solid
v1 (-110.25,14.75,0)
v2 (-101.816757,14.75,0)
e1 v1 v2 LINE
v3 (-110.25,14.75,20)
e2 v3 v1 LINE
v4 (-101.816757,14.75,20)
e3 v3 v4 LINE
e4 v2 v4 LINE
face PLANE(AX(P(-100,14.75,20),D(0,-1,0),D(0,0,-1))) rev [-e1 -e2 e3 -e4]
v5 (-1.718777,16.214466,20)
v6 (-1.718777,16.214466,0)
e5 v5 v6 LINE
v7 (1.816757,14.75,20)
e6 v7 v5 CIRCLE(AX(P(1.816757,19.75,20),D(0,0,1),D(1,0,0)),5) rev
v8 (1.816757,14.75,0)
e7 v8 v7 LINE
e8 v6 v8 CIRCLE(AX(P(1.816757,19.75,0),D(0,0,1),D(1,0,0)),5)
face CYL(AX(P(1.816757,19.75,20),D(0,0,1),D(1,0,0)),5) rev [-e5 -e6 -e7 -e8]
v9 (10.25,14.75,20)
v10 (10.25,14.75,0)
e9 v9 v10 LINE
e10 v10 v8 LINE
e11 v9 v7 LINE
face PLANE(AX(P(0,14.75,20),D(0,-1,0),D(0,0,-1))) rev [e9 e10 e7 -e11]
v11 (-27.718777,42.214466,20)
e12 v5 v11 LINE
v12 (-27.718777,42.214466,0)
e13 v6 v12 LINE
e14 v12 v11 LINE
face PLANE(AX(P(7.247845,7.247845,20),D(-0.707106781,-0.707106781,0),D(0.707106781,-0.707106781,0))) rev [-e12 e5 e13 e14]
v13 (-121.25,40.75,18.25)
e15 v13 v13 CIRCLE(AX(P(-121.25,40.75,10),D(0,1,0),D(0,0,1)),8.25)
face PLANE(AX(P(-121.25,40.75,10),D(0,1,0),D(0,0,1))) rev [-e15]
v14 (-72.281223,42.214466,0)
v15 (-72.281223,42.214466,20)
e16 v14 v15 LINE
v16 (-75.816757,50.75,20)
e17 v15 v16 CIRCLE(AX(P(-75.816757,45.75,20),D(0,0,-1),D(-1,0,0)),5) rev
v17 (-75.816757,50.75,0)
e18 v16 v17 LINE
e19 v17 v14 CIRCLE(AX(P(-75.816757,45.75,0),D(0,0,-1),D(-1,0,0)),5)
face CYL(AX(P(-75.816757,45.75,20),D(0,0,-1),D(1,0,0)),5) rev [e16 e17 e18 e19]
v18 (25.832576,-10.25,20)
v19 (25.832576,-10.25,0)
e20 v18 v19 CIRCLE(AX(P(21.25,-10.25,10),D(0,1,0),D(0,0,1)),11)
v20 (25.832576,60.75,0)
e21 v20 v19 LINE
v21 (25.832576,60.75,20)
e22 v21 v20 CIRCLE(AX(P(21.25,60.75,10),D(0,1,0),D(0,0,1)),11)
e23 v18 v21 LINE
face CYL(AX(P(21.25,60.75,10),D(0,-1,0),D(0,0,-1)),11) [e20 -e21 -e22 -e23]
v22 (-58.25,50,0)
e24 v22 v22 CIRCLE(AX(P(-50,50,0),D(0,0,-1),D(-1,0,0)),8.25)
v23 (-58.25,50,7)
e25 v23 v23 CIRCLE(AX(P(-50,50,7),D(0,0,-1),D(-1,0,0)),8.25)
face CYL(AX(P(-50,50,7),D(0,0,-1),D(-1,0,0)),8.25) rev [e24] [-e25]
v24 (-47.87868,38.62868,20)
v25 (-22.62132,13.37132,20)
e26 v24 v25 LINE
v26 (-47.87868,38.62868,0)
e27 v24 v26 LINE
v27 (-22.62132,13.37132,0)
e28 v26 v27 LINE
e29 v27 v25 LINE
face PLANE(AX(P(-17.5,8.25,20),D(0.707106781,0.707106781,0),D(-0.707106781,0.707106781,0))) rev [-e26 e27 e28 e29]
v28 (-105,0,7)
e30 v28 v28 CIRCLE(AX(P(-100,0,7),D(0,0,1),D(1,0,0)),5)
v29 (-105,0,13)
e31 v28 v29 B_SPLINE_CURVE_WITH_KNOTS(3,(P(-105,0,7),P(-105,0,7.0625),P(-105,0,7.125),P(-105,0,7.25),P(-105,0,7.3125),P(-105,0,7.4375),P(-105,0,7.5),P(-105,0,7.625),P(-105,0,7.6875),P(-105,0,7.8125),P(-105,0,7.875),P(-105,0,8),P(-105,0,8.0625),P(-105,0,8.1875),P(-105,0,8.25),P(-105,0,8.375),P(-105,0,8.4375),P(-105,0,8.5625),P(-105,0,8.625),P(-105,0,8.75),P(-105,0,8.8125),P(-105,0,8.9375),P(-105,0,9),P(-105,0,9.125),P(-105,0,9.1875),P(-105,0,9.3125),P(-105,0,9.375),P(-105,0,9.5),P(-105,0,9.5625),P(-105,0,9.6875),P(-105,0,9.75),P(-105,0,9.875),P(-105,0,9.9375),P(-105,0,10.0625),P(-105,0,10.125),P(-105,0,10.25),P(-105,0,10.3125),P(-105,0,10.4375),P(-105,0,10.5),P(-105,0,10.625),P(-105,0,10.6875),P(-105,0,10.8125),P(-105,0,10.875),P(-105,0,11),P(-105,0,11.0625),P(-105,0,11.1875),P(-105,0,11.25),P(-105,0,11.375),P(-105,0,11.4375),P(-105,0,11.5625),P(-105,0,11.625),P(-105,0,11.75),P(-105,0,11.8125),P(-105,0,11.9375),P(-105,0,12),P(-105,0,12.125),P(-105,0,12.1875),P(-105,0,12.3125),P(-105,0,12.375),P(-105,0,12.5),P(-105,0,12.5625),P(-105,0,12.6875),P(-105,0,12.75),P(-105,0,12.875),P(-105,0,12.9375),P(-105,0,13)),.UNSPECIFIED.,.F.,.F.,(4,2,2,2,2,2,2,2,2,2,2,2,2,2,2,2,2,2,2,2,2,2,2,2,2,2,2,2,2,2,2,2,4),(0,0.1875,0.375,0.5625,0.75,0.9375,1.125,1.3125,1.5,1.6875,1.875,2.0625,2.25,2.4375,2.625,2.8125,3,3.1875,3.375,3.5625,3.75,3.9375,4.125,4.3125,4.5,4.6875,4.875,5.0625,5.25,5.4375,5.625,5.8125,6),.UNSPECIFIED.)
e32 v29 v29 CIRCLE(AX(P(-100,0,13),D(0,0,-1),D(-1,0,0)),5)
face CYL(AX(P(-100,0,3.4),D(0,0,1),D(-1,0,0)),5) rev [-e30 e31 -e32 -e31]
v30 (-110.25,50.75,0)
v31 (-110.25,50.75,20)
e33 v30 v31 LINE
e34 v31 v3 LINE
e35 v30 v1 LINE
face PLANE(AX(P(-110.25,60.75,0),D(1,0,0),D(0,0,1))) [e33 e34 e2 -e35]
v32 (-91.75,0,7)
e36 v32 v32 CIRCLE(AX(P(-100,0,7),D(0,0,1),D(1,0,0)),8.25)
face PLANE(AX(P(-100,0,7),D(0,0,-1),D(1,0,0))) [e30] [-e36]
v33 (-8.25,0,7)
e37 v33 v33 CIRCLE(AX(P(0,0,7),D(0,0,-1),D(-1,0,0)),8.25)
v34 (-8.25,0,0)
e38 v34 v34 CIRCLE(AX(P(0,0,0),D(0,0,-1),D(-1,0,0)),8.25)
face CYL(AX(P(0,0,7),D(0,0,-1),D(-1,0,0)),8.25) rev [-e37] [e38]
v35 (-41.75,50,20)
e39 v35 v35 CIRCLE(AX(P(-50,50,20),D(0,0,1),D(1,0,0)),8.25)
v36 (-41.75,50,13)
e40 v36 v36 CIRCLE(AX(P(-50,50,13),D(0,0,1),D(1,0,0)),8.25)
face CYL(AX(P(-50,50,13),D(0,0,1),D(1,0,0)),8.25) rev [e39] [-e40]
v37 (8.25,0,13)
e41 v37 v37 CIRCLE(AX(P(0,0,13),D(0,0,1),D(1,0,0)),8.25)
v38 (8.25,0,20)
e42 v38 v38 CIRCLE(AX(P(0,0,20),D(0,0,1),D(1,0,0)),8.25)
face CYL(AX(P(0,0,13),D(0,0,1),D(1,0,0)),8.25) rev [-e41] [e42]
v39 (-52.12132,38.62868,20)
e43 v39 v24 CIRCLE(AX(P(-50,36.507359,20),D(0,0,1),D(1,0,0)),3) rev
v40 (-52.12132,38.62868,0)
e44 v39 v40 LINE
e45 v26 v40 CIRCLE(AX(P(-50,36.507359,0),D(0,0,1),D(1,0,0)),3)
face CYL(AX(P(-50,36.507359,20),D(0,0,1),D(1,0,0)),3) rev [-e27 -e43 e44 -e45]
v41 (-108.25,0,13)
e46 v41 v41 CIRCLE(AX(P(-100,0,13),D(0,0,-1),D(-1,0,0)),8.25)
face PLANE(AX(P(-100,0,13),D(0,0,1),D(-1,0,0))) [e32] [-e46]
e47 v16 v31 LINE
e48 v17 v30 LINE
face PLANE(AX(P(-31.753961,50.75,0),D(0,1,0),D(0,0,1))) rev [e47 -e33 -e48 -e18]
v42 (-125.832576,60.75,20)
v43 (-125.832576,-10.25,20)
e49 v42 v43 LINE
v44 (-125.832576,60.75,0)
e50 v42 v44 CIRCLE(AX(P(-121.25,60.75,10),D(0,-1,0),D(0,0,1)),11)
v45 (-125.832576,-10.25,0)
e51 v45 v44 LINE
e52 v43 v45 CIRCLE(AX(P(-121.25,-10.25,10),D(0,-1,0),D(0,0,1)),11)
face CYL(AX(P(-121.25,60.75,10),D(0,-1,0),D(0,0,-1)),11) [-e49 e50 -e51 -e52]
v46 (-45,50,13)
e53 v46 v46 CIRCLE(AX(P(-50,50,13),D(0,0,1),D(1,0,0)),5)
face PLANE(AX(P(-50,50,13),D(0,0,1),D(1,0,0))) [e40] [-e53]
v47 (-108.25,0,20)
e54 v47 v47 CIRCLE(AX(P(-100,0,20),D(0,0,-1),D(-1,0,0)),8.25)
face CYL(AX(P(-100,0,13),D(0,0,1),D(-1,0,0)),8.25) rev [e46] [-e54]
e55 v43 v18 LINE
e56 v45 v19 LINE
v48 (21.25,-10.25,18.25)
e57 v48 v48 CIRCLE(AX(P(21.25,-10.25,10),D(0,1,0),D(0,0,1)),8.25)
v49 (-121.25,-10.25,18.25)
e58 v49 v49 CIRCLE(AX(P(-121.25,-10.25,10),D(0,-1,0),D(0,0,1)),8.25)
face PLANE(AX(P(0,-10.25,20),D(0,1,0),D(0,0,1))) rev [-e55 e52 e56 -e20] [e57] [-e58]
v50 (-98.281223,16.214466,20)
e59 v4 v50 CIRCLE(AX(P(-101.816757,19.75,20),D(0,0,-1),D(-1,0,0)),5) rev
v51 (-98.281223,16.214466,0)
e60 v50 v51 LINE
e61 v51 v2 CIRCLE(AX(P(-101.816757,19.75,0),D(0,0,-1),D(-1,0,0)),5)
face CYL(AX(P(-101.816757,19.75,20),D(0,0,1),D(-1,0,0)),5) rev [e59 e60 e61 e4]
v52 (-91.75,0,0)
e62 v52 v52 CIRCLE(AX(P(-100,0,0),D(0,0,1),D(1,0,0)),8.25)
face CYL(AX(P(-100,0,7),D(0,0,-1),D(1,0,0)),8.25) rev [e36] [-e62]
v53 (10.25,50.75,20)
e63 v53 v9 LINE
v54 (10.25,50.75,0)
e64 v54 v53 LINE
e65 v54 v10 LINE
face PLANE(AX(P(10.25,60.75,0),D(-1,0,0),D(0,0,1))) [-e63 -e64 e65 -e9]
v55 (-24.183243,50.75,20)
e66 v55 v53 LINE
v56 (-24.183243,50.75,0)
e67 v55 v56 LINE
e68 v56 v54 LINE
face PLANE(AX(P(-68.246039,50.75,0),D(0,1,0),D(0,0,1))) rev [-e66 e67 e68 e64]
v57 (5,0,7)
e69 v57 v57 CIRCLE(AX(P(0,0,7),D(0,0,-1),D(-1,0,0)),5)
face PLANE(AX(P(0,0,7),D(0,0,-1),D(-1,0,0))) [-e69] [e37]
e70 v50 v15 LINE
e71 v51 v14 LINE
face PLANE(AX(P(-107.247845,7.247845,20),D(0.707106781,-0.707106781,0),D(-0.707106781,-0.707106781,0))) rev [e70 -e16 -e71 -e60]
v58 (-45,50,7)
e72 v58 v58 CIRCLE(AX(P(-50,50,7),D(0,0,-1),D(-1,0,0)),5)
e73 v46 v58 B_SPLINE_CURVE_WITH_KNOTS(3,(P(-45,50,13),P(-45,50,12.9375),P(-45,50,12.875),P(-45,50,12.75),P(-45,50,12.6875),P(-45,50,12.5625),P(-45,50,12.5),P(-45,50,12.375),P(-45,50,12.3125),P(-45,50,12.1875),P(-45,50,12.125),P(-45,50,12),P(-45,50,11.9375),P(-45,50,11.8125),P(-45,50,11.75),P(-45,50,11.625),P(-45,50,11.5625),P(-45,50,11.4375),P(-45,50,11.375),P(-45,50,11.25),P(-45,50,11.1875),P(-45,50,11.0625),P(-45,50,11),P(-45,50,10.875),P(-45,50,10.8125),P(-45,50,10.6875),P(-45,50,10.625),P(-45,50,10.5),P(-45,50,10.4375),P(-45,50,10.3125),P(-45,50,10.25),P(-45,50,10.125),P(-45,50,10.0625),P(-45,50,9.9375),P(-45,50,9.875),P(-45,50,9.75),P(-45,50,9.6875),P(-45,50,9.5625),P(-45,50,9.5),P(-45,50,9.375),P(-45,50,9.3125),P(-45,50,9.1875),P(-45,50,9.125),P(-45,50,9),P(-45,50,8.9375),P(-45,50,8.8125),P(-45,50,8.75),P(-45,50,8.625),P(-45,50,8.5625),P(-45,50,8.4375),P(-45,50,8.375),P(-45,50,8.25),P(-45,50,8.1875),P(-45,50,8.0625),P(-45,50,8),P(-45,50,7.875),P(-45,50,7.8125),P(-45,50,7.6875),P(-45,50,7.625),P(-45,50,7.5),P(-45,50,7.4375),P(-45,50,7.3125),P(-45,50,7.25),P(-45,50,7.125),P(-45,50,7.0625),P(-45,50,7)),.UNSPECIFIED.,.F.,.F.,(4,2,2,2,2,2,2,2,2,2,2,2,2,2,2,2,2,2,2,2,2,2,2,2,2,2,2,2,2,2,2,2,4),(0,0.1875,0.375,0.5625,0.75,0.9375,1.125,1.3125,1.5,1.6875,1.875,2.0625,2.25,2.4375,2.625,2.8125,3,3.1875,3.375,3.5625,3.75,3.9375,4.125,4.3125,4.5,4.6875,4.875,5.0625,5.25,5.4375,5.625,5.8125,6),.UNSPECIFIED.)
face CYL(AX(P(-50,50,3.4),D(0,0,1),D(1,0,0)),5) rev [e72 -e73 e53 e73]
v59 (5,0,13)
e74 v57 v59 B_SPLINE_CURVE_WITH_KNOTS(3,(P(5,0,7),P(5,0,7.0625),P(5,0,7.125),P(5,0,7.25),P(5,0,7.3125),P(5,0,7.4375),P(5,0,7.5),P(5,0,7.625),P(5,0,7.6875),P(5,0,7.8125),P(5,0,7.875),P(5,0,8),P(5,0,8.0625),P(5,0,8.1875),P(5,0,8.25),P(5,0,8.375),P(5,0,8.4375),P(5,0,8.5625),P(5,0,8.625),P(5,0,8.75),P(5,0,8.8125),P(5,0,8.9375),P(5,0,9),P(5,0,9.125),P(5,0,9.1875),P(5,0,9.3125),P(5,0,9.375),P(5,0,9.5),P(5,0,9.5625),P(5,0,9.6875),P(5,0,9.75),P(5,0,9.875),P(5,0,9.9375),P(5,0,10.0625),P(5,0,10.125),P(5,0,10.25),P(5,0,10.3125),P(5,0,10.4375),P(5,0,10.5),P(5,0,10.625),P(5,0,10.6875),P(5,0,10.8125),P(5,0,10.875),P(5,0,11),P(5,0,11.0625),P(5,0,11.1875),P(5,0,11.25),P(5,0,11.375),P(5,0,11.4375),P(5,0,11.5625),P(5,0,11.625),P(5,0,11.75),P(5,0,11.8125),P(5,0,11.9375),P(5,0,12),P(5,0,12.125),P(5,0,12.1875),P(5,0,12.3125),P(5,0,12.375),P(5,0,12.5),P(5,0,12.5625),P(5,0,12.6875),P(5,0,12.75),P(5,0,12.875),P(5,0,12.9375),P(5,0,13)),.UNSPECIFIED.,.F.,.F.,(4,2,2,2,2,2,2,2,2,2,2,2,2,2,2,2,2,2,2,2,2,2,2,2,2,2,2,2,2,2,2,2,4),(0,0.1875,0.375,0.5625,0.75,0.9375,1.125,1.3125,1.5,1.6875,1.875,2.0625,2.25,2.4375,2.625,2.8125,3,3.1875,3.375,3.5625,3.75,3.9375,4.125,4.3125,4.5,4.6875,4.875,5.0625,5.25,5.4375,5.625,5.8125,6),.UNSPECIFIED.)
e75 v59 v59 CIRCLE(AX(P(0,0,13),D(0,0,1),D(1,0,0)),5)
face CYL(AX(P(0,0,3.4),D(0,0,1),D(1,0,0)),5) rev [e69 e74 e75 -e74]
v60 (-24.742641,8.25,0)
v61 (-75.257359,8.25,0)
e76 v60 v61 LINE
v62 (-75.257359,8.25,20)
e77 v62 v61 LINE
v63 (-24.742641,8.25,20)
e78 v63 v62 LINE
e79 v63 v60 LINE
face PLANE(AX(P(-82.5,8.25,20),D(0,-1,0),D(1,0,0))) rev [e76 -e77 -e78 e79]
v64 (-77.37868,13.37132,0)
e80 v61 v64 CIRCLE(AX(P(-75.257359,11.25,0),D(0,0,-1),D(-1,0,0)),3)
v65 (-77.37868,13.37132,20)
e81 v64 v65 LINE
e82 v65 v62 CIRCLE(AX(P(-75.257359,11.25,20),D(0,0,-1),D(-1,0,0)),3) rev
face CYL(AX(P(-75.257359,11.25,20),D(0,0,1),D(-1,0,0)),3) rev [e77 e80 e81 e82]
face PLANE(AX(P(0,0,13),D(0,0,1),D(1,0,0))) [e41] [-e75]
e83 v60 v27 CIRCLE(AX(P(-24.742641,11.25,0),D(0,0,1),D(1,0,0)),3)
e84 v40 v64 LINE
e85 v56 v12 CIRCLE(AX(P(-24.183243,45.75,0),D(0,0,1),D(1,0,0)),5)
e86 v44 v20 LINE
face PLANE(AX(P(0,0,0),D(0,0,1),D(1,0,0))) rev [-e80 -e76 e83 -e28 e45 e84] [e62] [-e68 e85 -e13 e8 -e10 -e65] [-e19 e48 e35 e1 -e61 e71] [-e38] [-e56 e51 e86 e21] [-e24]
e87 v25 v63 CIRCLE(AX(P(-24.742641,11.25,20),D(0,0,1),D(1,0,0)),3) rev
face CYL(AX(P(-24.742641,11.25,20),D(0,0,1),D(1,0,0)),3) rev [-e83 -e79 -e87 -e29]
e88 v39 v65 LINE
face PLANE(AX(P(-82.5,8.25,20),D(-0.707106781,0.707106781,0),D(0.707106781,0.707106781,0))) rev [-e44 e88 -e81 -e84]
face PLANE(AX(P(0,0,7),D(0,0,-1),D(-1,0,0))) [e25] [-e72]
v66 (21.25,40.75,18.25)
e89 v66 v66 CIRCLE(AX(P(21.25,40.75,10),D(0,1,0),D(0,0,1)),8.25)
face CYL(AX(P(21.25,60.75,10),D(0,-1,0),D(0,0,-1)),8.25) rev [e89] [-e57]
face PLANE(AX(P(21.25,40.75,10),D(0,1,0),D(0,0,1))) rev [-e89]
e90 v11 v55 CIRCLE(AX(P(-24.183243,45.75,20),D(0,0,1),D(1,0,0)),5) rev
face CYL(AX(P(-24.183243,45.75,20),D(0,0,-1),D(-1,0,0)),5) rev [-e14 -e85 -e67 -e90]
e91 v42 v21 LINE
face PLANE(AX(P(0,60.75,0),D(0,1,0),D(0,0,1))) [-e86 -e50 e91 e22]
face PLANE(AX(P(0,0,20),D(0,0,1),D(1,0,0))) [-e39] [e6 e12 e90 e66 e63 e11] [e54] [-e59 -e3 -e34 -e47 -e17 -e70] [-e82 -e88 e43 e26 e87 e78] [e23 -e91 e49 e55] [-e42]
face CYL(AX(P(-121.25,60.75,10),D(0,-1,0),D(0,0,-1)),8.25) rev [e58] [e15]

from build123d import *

# Parameters (mm, degrees)
BOSS_EXTRUDE4_DEPTH      = 20
SKETCH3_R                = 8.25
CUT_EXTRUDE1_DEPTH       = 7
CUT_EXTRUDE2_START       = -7
SKETCH4_R                = 8.25
CUT_EXTRUDE2_DEPTH       = 7
CUT_EXTRUDE3_DEPTH       = 128.220772675
SKETCH6_R                = 5
CUT_EXTRUDE4_DEPTH       = 16.6
FILLET1_R                = 3
BOSS_EXTRUDE5_DEPTH      = 20
BOSS_EXTRUDE6_DEPTH      = 46
BOSS_EXTRUDE6_DEPTH_BACK = 25
SKETCH8_R                = 11
SKETCH8_R_2              = 8.25
BOSS_EXTRUDE7_REACH      = 138.572
SKETCH9_W                = 20
SKETCH9_H                = 10
FILLET2_R                = 5
FILLET5_R                = 5
SKETCH10_W               = 60.25
SKETCH10_H               = 70.5
CUT_EXTRUDE5_DEPTH       = 128.619062056
BOSS_EXTRUDE8_DEPTH      = 20
BOSS_EXTRUDE9_START      = -20
SKETCH12_R               = 11
BOSS_EXTRUDE9_DEPTH      = 20
SKETCH13_OUTSIDE_W       = 202.602
SKETCH13_OUTSIDE_H       = 60.102
SKETCH13_OUTSIDE_W_2     = 164.5
SKETCH13_OUTSIDE_H_2     = 20
CUT_EXTRUDE6_DEPTH       = 152.565373684


with BuildPart() as part:
    # Sketch2 → Boss-Extrude4 (new body)
    with BuildSketch(Plane.XY):
        with BuildLine():
            Line((-100, 10.25), (0, 10.25))
            ThreePointArc((0, 10.25), (10.25, 0), (0, -10.25))
            Line((0, -10.25), (-100, -10.25))
            ThreePointArc((-100, -10.25), (-110.25, 0), (-100, 10.25))
        make_face()
        with BuildLine():
            Line((-7.247844507, -7.247844507), (-57.247844507, 42.752155493))
            ThreePointArc((-57.247844507, 42.752155493), (-57.247844507, 57.247844507), (-42.752155493, 57.247844507))
            Line((-42.752155493, 57.247844507), (7.247844507, 7.247844507))
            ThreePointArc((7.247844507, 7.247844507), (7.247844507, -7.247844507), (-7.247844507, -7.247844507))
        make_face()
        with BuildLine():
            Line((-107.247844507, 7.247844507), (-57.247844507, 57.247844507))
            ThreePointArc((-57.247844507, 57.247844507), (-42.752155493, 57.247844507), (-42.752155493, 42.752155493))
            Line((-42.752155493, 42.752155493), (-92.752155493, -7.247844507))
            ThreePointArc((-92.752155493, -7.247844507), (-107.247844507, -7.247844507), (-107.247844507, 7.247844507))
        make_face()
    extrude(amount=BOSS_EXTRUDE4_DEPTH)

    # Sketch3 → Cut-Extrude1 (cut)
    with BuildSketch(Plane(origin=(0, 0, 0), x_dir=(-1, 0, 0), z_dir=(0, 0, -1))):
        Circle(SKETCH3_R)
        with Locations((50, 50)):
            Circle(SKETCH3_R)
        with Locations((100, 0)):
            Circle(SKETCH3_R)
    extrude(amount=-CUT_EXTRUDE1_DEPTH, mode=Mode.SUBTRACT)

    # Sketch4 → Cut-Extrude2 (cut)
    with BuildSketch(Plane.XY.offset(20).offset(CUT_EXTRUDE2_START)):
        with Locations(Location((-100, 0, 0), (0, 0, 180))):
            Circle(SKETCH4_R)
        with Locations(Location((-50, 50, 0), (0, 0, 180))):
            Circle(SKETCH4_R)
        with Locations(Location((0, 0, 0), (0, 0, 180))):
            Circle(SKETCH4_R)
    extrude(amount=CUT_EXTRUDE2_DEPTH, mode=Mode.SUBTRACT)

    # Sketch5 → Cut-Extrude3 (cut, through all)
    with BuildSketch(Plane(origin=(0, 0, 0), x_dir=(-1, 0, 0), z_dir=(0, 0, -1))):
        Polygon((17.5, 8.25), (50, 40.75), (82.5, 8.25), align=None)
    extrude(amount=-CUT_EXTRUDE3_DEPTH, mode=Mode.SUBTRACT)

    # Sketch6 → Cut-Extrude4 (cut)
    with BuildSketch(Plane.XY.offset(20)):
        with Locations((-100, 0)):
            Circle(SKETCH6_R)
        with Locations((-50, 50)):
            Circle(SKETCH6_R)
        Circle(SKETCH6_R)
    extrude(amount=-CUT_EXTRUDE4_DEPTH, mode=Mode.SUBTRACT)

    # Fillet1
    fillet1_edges = [part.edges().sort_by_distance(p)[0] for p in [
        (-82.5, 8.25, 10),
        (-17.5, 8.25, 10),
        (-50, 40.75, 10),
    ]]
    fillet(fillet1_edges, radius=FILLET1_R)

    # Sketch7 → Boss-Extrude5 (add)
    with BuildSketch(Plane(origin=(0, 0, 0), x_dir=(-1, 0, 0), z_dir=(0, 0, -1))):
        with BuildLine():
            Line((-10.25, 14.75), (-10.25, 0))
            ThreePointArc((-10.25, 0), (-9.469765208, 3.922505182), (-7.247844507, 7.247844507))
            Line((-7.247844507, 7.247844507), (0.254310986, 14.75))
            Line((0.254310986, 14.75), (-10.25, 14.75))
        make_face()
        with BuildLine():
            Line((-10.25, -10.25), (0, -10.25))
            ThreePointArc((0, -10.25), (-7.247844507, -7.247844507), (-10.25, 0))
            Line((-10.25, 0), (-10.25, -10.25))
        make_face()
    extrude(amount=-BOSS_EXTRUDE5_DEPTH)

    # Sketch8 → Boss-Extrude6 (add, two sides: drawn at the far end of the back side and taken through both)
    # profile 1 of 3: a face of its own
    with BuildSketch(Plane(origin=(0, 14.75, 0), x_dir=(1, 0, 0), z_dir=(0, 1, 0)).offset(-BOSS_EXTRUDE6_DEPTH_BACK)):
        with BuildLine():
            Line((10.25, 0), (10.25, -10))
            ThreePointArc((10.25, -10), (13.110659193, -2.600599266), (20.204751131, 0.950226244))
            Line((20.204751131, 0.950226244), (10.25, 0))
        make_face()
    # profile 2 of 3: a face of its own
    with BuildSketch(Plane(origin=(0, 14.75, 0), x_dir=(1, 0, 0), z_dir=(0, 1, 0)).offset(-BOSS_EXTRUDE6_DEPTH_BACK)):
        with Locations((21.25, -10)):
            Circle(SKETCH8_R)
        with Locations(Location((21.25, -10, 0), (0, 0, 270))):
            Circle(SKETCH8_R_2, mode=Mode.SUBTRACT)
    # profile 3 of 3: a face of its own
    with BuildSketch(Plane(origin=(0, 14.75, 0), x_dir=(1, 0, 0), z_dir=(0, 1, 0)).offset(-BOSS_EXTRUDE6_DEPTH_BACK)):
        with BuildLine():
            Line((10.25, -10), (10.25, -20))
            Line((10.25, -20), (20.204751131, -20.950226244))
            ThreePointArc((20.204751131, -20.950226244), (13.110659193, -17.399400734), (10.25, -10))
        make_face()
    extrude(amount=BOSS_EXTRUDE6_DEPTH + BOSS_EXTRUDE6_DEPTH_BACK)

    # Boss-Extrude7: up to this plane
    boss_extrude7_end = Plane(origin=(7.247844507, 7.247844507, 20), z_dir=(-0.7071067811865439, -0.7071067811865512, 0))
    # Sketch9 → Boss-Extrude7 (add, up to the surface)
    with BuildSketch(Plane.ZY.offset(-10.25), mode=Mode.PRIVATE) as boss_extrude7_sk1:
        with Locations((10, 55.75)):
            Rectangle(SKETCH9_W, SKETCH9_H)
    boss_extrude7_tool1 = split(extrude(boss_extrude7_sk1.sketch, amount=BOSS_EXTRUDE7_REACH, mode=Mode.PRIVATE), bisect_by=boss_extrude7_end, keep=Keep.BOTH, mode=Mode.PRIVATE)
    add(boss_extrude7_tool1.solids().sort_by_distance((10.25, 55.75, 10))[0])

    # Fillet2
    # the kernel refuses this fillet: 5 mm, written as the material it adds along each edge
    with BuildSketch(Plane(origin=(10.25, 14.75, 0), x_dir=(-1, 0, 0), z_dir=(0, -1, 0)), Plane(origin=(10.25, -10.25, 20), x_dir=(-1, 0, 0), z_dir=(0, 1, 0))) as fillet2_piece_1:
        with BuildLine():
            CenterArc((FILLET2_R * 0.047619047619, FILLET2_R), FILLET2_R, 264.547378012, 5.452621988)
            Line((-FILLET2_R * 0.0474035768153, FILLET2_R * 0.00452488687783), (0, 0))
            Line((0, 0), (FILLET2_R * 0.047619047619, 0))
        make_face()
    extrude(amount=25)
    with BuildSketch(Plane(origin=(10.25, 50.75, 0), x_dir=(-1, 0, 0), z_dir=(0, 1, 0)), Plane(origin=(10.25, 60.75, 20), x_dir=(-1, 0, 0), z_dir=(0, -1, 0))) as fillet2_piece_2:
        with BuildLine():
            CenterArc((FILLET2_R * 0.047619047619, -FILLET2_R), FILLET2_R, 90, 5.452621988)
            Line((-FILLET2_R * 0.0474035768153, -FILLET2_R * 0.00452488687783), (0, 0))
            Line((0, 0), (FILLET2_R * 0.047619047619, 0))
        make_face()
    extrude(amount=10)

    # Fillet5
    fillet5_edges = [part.edges().sort_by_distance(p)[0] for p in [
        (-0.254310986, 14.75, 10),
        (-36.254310986, 50.75, 10),
    ]]
    fillet(fillet5_edges, radius=FILLET5_R)

    # Sketch10 → Cut-Extrude5 (cut, through all)
    with BuildSketch(Plane(origin=(0, 0, 0), x_dir=(-1, 0, 0), z_dir=(0, 0, -1))):
        with Locations((80.125, 25)):
            Rectangle(SKETCH10_W, SKETCH10_H)
    extrude(amount=-CUT_EXTRUDE5_DEPTH, mode=Mode.SUBTRACT)

    # Mirror1: part across plane


with BuildPart() as part_1:
    add(part.part)
    add(part.part.mirror(Plane(origin=(-50, -10.25, 21), x_dir=(0, 0, 1), z_dir=(1, 0, 0))))

    # Sketch11 → Boss-Extrude8 (add)
    with BuildSketch(Plane(origin=(0, 0, 0), x_dir=(-1, 0, 0), z_dir=(0, 0, -1))):
        with BuildLine():
            Line((46.254310986, 60.75), (53.745689014, 60.75))
            Line((53.745689014, 60.75), (57.247844507, 57.247844507))
            ThreePointArc((57.247844507, 57.247844507), (50, 60.25), (42.752155493, 57.247844507))
            Line((42.752155493, 57.247844507), (46.254310986, 60.75))
        make_face()
    extrude(amount=-BOSS_EXTRUDE8_DEPTH)

    # Sketch12 → Boss-Extrude9 (add)
    with BuildSketch(Plane(origin=(0, 60.75, 0), x_dir=(1, 0, 0), z_dir=(0, 1, 0)).offset(BOSS_EXTRUDE9_START)):
        with Locations((-121.25, -10)):
            Circle(SKETCH12_R)
        with Locations((21.25, -10)):
            Circle(SKETCH12_R)
    extrude(amount=BOSS_EXTRUDE9_DEPTH)

    # Sketch13 outside → Cut-Extrude6 (cut, through all)
    with BuildSketch(Plane(origin=(0, 60.75, 0), x_dir=(1, 0, 0), z_dir=(0, 1, 0))):
        with Locations((-50, -10)):
            Rectangle(SKETCH13_OUTSIDE_W, SKETCH13_OUTSIDE_H)
        with Locations((-50, -10)):
            Rectangle(SKETCH13_OUTSIDE_W_2, SKETCH13_OUTSIDE_H_2, mode=Mode.SUBTRACT)
    extrude(amount=-CUT_EXTRUDE6_DEPTH, mode=Mode.SUBTRACT)


solid = part_1.part
